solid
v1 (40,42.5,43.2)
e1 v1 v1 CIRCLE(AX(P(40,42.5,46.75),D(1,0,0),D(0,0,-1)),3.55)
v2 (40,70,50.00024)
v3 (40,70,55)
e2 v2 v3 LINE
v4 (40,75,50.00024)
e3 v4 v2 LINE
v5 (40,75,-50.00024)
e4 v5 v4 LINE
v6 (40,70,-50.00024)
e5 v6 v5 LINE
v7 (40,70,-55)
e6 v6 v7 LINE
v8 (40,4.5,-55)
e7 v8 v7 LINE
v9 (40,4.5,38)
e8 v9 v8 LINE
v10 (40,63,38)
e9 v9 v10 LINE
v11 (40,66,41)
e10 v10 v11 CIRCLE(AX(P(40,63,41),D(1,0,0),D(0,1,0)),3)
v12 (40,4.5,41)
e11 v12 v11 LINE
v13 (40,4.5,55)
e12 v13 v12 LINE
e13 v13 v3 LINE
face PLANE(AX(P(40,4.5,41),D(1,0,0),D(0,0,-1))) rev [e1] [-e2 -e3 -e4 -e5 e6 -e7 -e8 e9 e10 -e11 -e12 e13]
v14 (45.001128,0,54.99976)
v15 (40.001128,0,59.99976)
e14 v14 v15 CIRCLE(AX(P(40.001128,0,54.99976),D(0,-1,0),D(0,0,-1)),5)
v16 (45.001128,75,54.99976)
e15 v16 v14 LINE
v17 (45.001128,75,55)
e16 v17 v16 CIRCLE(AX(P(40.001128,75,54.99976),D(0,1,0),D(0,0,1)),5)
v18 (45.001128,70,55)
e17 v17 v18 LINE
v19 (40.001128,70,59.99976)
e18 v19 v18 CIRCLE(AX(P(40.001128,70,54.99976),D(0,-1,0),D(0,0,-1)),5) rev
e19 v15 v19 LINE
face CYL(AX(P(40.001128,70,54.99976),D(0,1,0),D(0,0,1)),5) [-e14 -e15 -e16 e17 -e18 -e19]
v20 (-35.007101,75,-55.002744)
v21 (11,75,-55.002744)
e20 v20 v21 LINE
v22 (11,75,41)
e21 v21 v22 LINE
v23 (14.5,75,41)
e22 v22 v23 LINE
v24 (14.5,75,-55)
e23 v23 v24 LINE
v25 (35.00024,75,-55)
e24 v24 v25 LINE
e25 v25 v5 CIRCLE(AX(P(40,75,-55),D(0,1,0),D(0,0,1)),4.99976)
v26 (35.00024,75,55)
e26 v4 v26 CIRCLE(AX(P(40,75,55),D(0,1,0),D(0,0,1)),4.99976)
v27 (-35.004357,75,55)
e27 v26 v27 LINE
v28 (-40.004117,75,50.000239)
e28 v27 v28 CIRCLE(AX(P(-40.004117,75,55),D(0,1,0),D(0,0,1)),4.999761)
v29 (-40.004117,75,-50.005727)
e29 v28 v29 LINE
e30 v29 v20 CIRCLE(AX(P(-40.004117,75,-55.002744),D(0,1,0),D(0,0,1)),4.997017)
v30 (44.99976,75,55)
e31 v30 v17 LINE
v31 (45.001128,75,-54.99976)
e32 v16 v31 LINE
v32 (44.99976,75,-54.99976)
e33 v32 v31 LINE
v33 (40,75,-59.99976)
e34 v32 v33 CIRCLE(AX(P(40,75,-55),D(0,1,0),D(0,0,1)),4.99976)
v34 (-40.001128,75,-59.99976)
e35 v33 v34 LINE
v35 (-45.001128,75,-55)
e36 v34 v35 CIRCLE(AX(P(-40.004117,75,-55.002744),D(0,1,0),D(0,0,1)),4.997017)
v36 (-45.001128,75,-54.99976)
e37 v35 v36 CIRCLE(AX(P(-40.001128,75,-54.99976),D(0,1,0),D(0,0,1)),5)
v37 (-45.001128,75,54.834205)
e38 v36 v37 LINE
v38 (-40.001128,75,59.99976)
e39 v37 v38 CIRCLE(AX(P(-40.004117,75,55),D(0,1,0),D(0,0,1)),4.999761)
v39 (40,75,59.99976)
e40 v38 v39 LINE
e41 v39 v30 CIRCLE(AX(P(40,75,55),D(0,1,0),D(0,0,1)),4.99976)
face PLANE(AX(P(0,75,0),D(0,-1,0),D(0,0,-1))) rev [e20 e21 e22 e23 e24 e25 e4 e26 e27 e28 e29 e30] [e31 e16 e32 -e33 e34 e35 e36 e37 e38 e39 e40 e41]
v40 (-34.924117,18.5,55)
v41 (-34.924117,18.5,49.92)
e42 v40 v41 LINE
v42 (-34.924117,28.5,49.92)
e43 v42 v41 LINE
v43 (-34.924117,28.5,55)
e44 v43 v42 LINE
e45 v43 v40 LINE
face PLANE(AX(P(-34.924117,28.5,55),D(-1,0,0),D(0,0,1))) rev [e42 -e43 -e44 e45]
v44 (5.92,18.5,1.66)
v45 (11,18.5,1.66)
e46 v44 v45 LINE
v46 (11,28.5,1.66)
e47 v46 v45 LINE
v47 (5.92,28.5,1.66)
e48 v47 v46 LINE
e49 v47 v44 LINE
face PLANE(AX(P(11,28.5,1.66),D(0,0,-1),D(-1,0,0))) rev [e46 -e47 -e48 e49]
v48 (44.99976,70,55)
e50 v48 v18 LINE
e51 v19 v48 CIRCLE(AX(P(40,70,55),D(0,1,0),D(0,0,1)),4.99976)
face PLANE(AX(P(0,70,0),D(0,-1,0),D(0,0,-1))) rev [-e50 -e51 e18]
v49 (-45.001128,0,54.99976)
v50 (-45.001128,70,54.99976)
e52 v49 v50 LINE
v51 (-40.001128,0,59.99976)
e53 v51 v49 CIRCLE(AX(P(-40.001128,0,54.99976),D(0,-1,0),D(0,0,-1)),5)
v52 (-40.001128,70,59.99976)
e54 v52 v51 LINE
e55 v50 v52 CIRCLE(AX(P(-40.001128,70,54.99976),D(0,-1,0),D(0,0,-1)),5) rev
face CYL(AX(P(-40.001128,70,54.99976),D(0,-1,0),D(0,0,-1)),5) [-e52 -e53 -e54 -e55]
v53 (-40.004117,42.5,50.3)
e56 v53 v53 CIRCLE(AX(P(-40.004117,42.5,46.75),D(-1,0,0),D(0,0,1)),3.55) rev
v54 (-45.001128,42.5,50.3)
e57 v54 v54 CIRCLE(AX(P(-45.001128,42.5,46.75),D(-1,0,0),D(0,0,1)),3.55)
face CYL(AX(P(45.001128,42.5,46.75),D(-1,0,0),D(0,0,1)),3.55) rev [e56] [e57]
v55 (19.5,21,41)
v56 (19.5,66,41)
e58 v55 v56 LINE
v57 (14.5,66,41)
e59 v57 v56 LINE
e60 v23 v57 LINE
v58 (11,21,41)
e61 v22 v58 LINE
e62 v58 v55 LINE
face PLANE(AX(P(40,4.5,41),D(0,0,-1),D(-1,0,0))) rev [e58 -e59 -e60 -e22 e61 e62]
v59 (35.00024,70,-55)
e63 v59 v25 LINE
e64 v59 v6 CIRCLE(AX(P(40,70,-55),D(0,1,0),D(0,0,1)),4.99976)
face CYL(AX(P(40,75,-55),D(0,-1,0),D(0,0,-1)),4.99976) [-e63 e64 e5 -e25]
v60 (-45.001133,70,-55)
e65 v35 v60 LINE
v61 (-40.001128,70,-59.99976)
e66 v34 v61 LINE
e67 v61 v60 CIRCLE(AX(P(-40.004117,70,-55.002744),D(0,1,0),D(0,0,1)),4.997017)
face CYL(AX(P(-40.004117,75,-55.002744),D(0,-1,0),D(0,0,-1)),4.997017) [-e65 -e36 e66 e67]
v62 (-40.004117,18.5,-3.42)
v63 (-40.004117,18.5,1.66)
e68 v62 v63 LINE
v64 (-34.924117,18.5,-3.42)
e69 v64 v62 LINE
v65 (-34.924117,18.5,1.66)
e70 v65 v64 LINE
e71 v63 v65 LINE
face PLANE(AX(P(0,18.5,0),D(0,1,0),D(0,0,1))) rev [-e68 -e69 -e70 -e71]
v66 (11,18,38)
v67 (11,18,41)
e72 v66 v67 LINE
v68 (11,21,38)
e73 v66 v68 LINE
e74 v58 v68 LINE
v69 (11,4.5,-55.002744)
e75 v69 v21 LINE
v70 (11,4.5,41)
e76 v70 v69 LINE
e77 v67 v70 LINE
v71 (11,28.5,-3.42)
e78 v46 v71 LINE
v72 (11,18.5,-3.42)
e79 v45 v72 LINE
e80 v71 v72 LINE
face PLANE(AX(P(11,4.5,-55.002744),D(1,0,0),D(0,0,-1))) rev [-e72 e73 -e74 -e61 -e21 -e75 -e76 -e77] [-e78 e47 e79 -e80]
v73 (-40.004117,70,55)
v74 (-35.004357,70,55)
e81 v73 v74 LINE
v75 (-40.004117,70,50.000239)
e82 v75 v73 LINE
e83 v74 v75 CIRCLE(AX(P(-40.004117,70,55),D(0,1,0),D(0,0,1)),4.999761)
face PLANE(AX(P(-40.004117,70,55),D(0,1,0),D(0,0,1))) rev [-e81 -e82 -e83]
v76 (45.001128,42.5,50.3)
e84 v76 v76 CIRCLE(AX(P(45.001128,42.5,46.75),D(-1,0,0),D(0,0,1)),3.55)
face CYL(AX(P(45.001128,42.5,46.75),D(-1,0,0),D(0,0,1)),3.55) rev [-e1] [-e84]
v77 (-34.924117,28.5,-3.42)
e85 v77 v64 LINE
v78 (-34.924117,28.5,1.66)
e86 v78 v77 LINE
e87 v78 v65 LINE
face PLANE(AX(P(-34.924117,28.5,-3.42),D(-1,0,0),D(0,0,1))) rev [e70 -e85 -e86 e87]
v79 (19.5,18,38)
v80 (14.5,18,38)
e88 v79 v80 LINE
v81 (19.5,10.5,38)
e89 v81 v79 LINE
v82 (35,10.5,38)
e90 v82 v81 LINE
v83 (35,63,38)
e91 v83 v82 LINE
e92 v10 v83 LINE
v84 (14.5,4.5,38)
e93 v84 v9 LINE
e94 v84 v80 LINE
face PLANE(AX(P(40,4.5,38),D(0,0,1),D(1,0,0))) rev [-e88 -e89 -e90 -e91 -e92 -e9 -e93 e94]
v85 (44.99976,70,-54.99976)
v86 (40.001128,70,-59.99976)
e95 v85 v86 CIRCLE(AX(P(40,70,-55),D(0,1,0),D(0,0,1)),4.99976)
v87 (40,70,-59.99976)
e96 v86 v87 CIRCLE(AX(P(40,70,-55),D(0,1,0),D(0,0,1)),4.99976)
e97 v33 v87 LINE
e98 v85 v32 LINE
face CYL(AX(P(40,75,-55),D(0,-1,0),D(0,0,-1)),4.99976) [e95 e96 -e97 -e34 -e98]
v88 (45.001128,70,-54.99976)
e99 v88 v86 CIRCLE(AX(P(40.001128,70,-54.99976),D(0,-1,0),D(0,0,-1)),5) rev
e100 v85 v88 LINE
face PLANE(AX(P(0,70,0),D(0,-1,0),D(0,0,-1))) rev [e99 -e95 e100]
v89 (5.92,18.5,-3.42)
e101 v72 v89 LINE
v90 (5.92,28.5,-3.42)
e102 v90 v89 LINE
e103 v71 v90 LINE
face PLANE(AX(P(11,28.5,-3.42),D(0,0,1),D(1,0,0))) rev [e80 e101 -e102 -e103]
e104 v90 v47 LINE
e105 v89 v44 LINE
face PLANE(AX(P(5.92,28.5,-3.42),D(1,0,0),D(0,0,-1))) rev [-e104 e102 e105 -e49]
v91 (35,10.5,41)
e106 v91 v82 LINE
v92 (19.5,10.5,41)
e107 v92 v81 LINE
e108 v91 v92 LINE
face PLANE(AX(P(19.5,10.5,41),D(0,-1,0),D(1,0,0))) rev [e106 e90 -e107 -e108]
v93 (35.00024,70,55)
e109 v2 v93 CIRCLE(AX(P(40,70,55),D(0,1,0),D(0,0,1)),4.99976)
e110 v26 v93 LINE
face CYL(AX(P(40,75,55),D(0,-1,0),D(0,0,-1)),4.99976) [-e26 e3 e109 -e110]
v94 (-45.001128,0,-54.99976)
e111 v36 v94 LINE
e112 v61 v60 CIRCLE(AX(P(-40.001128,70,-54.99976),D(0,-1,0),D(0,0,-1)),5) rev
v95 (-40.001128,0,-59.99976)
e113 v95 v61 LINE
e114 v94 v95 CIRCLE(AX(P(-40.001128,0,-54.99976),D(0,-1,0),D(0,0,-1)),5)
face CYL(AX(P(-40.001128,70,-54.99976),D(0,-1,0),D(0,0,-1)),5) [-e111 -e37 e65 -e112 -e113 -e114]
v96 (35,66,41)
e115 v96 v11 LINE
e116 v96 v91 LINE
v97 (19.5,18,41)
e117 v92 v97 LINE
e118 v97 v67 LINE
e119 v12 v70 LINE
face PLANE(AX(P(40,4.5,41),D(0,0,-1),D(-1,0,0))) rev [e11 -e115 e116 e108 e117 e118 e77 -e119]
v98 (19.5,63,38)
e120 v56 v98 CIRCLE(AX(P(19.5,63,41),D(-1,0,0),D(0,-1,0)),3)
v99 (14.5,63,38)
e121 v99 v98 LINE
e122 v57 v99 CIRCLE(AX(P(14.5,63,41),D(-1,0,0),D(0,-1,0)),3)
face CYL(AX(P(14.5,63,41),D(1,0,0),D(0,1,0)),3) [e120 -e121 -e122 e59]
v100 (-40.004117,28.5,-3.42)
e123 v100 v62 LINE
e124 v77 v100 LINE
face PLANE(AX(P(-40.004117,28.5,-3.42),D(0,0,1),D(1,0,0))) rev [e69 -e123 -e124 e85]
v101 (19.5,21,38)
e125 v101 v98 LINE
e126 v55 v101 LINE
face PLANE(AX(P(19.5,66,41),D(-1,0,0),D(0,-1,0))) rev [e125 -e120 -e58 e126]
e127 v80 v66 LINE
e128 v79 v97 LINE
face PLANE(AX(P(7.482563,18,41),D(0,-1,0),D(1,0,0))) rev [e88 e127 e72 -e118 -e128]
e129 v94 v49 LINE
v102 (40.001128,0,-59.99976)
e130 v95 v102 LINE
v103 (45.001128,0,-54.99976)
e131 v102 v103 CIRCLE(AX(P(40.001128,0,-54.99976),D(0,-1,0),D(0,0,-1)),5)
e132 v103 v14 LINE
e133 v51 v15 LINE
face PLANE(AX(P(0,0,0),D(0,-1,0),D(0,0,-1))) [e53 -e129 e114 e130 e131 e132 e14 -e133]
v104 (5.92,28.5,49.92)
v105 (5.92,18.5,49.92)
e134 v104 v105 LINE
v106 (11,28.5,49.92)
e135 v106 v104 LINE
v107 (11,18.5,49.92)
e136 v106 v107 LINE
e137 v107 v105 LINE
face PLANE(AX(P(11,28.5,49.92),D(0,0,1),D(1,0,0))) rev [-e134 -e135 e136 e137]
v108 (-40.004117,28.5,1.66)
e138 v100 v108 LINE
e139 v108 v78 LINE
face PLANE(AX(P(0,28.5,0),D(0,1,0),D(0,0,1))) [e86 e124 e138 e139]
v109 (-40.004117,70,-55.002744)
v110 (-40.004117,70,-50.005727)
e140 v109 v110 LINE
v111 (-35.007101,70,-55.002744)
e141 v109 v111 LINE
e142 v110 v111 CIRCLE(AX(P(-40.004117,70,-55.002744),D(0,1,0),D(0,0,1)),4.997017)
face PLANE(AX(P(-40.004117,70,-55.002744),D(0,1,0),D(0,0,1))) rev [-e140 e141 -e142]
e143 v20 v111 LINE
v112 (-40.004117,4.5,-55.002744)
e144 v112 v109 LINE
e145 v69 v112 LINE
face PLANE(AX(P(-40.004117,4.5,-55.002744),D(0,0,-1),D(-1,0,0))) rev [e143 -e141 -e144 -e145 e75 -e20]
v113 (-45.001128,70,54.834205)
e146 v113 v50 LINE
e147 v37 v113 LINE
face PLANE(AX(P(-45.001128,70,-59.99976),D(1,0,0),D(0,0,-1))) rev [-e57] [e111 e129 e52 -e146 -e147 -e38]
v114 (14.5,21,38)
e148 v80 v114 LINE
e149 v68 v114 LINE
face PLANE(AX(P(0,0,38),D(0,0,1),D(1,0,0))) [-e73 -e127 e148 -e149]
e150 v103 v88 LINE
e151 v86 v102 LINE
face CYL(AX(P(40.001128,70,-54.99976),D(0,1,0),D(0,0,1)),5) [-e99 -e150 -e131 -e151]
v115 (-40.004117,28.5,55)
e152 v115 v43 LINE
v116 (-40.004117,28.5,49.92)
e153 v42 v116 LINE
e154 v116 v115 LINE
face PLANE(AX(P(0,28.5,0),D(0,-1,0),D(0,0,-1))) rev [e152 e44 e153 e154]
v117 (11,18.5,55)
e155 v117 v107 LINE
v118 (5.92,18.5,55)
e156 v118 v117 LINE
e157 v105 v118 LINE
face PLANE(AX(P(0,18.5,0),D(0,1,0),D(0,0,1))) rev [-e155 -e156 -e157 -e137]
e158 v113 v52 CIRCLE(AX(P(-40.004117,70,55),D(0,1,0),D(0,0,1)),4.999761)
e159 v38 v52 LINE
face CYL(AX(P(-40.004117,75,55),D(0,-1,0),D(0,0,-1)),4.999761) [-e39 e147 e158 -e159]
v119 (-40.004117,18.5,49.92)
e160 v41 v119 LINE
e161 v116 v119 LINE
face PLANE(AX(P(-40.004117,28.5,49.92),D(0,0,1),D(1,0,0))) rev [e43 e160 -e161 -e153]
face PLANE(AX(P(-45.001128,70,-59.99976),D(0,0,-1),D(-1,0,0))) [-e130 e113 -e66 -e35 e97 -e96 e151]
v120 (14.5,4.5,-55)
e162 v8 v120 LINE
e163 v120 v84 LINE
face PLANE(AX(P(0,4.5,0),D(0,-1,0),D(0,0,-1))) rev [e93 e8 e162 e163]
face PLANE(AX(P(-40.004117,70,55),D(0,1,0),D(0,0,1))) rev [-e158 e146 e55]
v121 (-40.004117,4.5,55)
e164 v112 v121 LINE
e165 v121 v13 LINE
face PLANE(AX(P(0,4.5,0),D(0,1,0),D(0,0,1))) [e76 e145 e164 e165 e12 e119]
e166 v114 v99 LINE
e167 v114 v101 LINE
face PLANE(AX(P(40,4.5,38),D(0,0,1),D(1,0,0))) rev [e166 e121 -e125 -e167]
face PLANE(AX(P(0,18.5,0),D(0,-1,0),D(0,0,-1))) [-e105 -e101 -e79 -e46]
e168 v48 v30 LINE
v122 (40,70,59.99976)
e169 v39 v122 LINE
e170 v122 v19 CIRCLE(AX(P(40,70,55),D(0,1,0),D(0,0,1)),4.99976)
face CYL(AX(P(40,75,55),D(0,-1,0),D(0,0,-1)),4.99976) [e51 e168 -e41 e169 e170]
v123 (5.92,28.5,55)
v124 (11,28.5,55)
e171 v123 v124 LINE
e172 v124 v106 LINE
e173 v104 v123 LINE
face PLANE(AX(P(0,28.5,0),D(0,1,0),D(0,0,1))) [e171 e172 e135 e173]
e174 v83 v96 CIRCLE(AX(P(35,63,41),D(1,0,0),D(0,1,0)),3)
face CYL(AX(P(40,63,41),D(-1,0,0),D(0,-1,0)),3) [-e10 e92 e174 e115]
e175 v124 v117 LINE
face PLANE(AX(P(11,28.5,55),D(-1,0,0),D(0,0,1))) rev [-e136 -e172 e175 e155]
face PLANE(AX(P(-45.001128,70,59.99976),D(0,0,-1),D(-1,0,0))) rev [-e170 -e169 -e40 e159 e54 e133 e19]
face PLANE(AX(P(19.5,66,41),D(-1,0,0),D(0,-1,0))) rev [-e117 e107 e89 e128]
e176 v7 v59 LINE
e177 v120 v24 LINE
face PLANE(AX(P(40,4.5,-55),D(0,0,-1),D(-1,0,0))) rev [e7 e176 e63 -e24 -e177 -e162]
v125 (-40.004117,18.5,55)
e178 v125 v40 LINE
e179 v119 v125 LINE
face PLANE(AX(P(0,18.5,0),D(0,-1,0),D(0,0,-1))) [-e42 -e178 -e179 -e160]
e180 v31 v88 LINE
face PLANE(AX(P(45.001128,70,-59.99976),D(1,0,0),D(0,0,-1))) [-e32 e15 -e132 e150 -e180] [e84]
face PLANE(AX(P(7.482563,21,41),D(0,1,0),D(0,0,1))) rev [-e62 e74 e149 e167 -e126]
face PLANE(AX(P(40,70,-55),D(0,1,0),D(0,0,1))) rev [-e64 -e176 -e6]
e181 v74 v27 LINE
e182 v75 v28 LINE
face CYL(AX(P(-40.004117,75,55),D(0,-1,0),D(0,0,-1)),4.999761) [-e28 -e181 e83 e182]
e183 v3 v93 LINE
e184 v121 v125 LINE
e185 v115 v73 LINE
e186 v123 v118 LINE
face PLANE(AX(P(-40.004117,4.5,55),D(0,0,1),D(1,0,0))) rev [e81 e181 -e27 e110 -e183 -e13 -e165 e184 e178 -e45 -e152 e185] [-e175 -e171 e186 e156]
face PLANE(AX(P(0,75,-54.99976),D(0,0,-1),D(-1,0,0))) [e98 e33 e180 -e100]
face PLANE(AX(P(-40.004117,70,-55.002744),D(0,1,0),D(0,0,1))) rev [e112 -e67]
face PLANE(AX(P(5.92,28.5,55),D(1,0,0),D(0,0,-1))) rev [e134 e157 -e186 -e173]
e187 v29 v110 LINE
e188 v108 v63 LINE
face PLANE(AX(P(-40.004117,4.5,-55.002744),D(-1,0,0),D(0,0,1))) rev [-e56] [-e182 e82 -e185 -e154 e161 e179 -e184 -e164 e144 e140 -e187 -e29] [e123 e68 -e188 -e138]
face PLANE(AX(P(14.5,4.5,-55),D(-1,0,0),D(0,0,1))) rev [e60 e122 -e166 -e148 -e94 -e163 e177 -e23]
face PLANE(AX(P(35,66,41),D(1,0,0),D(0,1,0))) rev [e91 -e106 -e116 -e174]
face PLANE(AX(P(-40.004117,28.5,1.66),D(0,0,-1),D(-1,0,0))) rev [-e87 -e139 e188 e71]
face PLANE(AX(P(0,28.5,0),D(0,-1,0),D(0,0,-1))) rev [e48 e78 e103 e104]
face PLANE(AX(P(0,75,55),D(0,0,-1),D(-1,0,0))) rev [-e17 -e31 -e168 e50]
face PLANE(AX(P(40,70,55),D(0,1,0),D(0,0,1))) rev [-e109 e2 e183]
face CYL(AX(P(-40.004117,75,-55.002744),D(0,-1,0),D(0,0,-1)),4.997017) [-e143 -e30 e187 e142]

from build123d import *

# Parameters (mm, degrees)
SKETCH1_W                = 90.002256596
SKETCH1_H                = 119.999519638
BOSS_EXTRUDE1_DEPTH      = 70
SKETCH6_W                = 32
SKETCH6_H                = 11.5
CUT_EXTRUDE2_DEPTH       = 65.5
CUT_EXTRUDE11_DEPTH      = 126.400011923
CUT_EXTRUDE11_DEPTH_BACK = 126.400011923
SKETCH22_R               = 3.55
SKETCH2_W                = 25.5
SKETCH2_H                = 93
CUT_EXTRUDE12_DEPTH      = 65.5
SKETCH23_W               = 15.5
SKETCH23_H               = 55.5
CUT_EXTRUDE13_DEPTH      = 3
SKETCH24_W               = 14.034874412
SKETCH24_H               = 3
CUT_EXTRUDE14_DEPTH      = 3
FILLET2_R                = 5
FILLET3_R                = 5
FILLET4_R                = 5
FILLET5_R                = 5
SKETCH37_W               = 51.004117284
SKETCH37_H               = 107.502744057
CUT_EXTRUDE15_DEPTH      = 65.5
SKETCH53_W               = 3.5
SKETCH53_H               = 96
BOSS_EXTRUDE7_DEPTH      = 5
SKETCH54_W               = 25.5
SKETCH54_H               = 3
CUT_EXTRUDE16_DEPTH      = 4
CUT_EXTRUDE17_DEPTH      = 5
CUT_EXTRUDE18_START      = -5
CUT_EXTRUDE18_DEPTH      = 5
SKETCH58_W               = 80.004117284
SKETCH58_H               = 2.5
CUT_EXTRUDE19_DEPTH      = 65.5
BOSS_EXTRUDE8_START      = 14
SKETCH60_W               = 5.08
SKETCH60_H               = 5.08
BOSS_EXTRUDE8_DEPTH      = 10
BOSS_EXTRUDE9_DEPTH      = 5
SKETCH63_R               = 4.997016655
SKETCH63_R_2             = 4.999759946
SKETCH63_R_3             = 4.999760712
BOSS_EXTRUDE11_DEPTH     = 5
BOSS_EXTRUDE12_DEPTH     = 5


# Read off the part's stored shape, not the designer's step: Boss-Extrude12
with BuildPart() as part:
    # Sketch1 → Boss-Extrude1 (new body)
    with BuildSketch(Plane(origin=(0, 0, 0), x_dir=(1, 0, 0), z_dir=(0, 1, 0))):
        Rectangle(SKETCH1_W, SKETCH1_H)
    extrude(amount=BOSS_EXTRUDE1_DEPTH)

    # Sketch6 → Cut-Extrude2 (cut)
    with BuildSketch(Plane(origin=(0, 70, 0), x_dir=(1, 0, 0), z_dir=(0, 1, 0))):
        with Locations((24, -46.75)):
            Rectangle(SKETCH6_W, SKETCH6_H)
    extrude(amount=-CUT_EXTRUDE2_DEPTH, mode=Mode.SUBTRACT)

    # Sketch22 → Cut-Extrude11 (cut, two sides: drawn at the far end of the back side and taken through both)
    with BuildSketch(Plane.ZY.offset(-40).offset(-CUT_EXTRUDE11_DEPTH_BACK)):
        with Locations((46.75, 42.5)):
            Circle(SKETCH22_R)
    extrude(amount=CUT_EXTRUDE11_DEPTH + CUT_EXTRUDE11_DEPTH_BACK, mode=Mode.SUBTRACT)

    # Sketch2 → Cut-Extrude12 (cut)
    with BuildSketch(Plane(origin=(0, 70, 0), x_dir=(1, 0, 0), z_dir=(0, 1, 0))):
        with Locations((27.25, 8.5)):
            Rectangle(SKETCH2_W, SKETCH2_H)
    extrude(amount=-CUT_EXTRUDE12_DEPTH, mode=Mode.SUBTRACT)

    # Sketch23 → Cut-Extrude13 (cut)
    with BuildSketch(Plane(origin=(0, 0, 38), x_dir=(-1, 0, 0), z_dir=(0, 0, -1))):
        with Locations((-27.25, 38.25)):
            Rectangle(SKETCH23_W, SKETCH23_H)
    extrude(amount=-CUT_EXTRUDE13_DEPTH, mode=Mode.SUBTRACT)

    # Sketch24 → Cut-Extrude14 (cut)
    with BuildSketch(Plane(origin=(0, 0, 38), x_dir=(-1, 0, 0), z_dir=(0, 0, -1))):
        with Locations((-14.5, 19.5)):
            Rectangle(SKETCH24_W, SKETCH24_H)
    extrude(amount=-CUT_EXTRUDE14_DEPTH, mode=Mode.SUBTRACT)

    # Fillet2
    fillet2_edges = [part.edges().sort_by_distance(p)[0] for p in [
        (-45.001128298, 35, 59.999759819),
    ]]
    fillet(fillet2_edges, radius=FILLET2_R)

    # Fillet3
    fillet3_edges = [part.edges().sort_by_distance(p)[0] for p in [
        (45.001128298, 35, 59.999759819),
    ]]
    fillet(fillet3_edges, radius=FILLET3_R)

    # Fillet4
    fillet4_edges = [part.edges().sort_by_distance(p)[0] for p in [
        (45.001128298, 35, -59.999759819),
    ]]
    fillet(fillet4_edges, radius=FILLET4_R)

    # Fillet5
    fillet5_edges = [part.edges().sort_by_distance(p)[0] for p in [
        (-45.001128298, 35, -59.999759819),
    ]]
    fillet(fillet5_edges, radius=FILLET5_R)

    # Sketch37 → Cut-Extrude15 (cut)
    with BuildSketch(Plane(origin=(0, 70, 0), x_dir=(1, 0, 0), z_dir=(0, 1, 0))):
        with Locations((-14.502058642, 1.251372029)):
            Rectangle(SKETCH37_W, SKETCH37_H)
    extrude(amount=-CUT_EXTRUDE15_DEPTH, mode=Mode.SUBTRACT)

    # Sketch53 → Boss-Extrude7 (add)
    with BuildSketch(Plane(origin=(0, 70, 0), x_dir=(1, 0, 0), z_dir=(0, 1, 0))):
        with Locations((12.75, 7)):
            Rectangle(SKETCH53_W, SKETCH53_H)
    extrude(amount=BOSS_EXTRUDE7_DEPTH)

    # Sketch54 → Cut-Extrude16 (cut)
    with BuildSketch(Plane(origin=(0, 70, 0), x_dir=(1, 0, 0), z_dir=(0, 1, 0))):
        with Locations((27.25, -39.5)):
            Rectangle(SKETCH54_W, SKETCH54_H)
    extrude(amount=-CUT_EXTRUDE16_DEPTH, mode=Mode.SUBTRACT)

    # Sketch55 → Cut-Extrude17 (cut)
    with BuildSketch(Plane(origin=(19.5, 0, 0), x_dir=(0, 0, -1), z_dir=(1, 0, 0))):
        with BuildLine():
            Line((-38, 66), (-41, 66))
            ThreePointArc((-41, 66), (-38.878679656, 65.121320344), (-38, 63))
            Line((-38, 63), (-38, 66))
        make_face()
    extrude(amount=-CUT_EXTRUDE17_DEPTH, mode=Mode.SUBTRACT)

    # Sketch56 → Cut-Extrude18 (cut)
    with BuildSketch(Plane.ZY.offset(-35).offset(CUT_EXTRUDE18_START)):
        with BuildLine():
            Line((38, 66), (41, 66))
            ThreePointArc((41, 66), (38.878679656, 65.121320344), (38, 63))
            Line((38, 63), (38, 66))
        make_face()
    extrude(amount=CUT_EXTRUDE18_DEPTH, mode=Mode.SUBTRACT)

    # Sketch58 → Cut-Extrude19 (cut)
    with BuildSketch(Plane(origin=(0, 70, 0), x_dir=(1, 0, 0), z_dir=(0, 1, 0))):
        with Locations((-0.002058642, -53.75)):
            Rectangle(SKETCH58_W, SKETCH58_H)
    extrude(amount=-CUT_EXTRUDE19_DEPTH, mode=Mode.SUBTRACT)

    # Sketch60 → Boss-Extrude8 (add)
    with BuildSketch(Plane(origin=(0, 4.5, 0), x_dir=(1, 0, 0), z_dir=(0, 1, 0)).offset(BOSS_EXTRUDE8_START)):
        with Locations((8.46, -52.46)):
            Rectangle(SKETCH60_W, SKETCH60_H)
        with Locations((-37.464117284, -52.46)):
            Rectangle(SKETCH60_W, SKETCH60_H)
        with Locations((-37.464117284, 0.88)):
            Rectangle(SKETCH60_W, SKETCH60_H)
        with Locations((8.46, 0.88)):
            Rectangle(SKETCH60_W, SKETCH60_H)
    extrude(amount=BOSS_EXTRUDE8_DEPTH)

    # Sketch61 → Boss-Extrude9 (add)
    with BuildSketch(Plane(origin=(0, 70, 0), x_dir=(1, 0, 0), z_dir=(0, 1, 0))):
        Polygon((40, 54.999759819), (40, -55), (45.001128298, -55), (45.001128298, -54.999759819), (45.001128298, 54.999759819), align=None)
        Polygon((-40.004117284, -54.999759819), (-40.004117284, 55), (-45.001128298, 55), (-45.001128298, 54.999759819), (-45.001128298, -54.999759819), align=None)
    extrude(amount=BOSS_EXTRUDE9_DEPTH)

    # Sketch63 → Boss-Extrude11 (add)
    with BuildSketch(Plane(origin=(0, 70, 0), x_dir=(1, 0, 0), z_dir=(0, 1, 0))):
        with Locations((-40.004117284, 55.002744057)):
            Circle(SKETCH63_R)
        with Locations((40, 55)):
            Circle(SKETCH63_R_2)
        with Locations((40, -55)):
            Circle(SKETCH63_R_2)
        with Locations((-40.004117284, -55)):
            Circle(SKETCH63_R_3)
    extrude(amount=BOSS_EXTRUDE11_DEPTH)

    # Boss-Extrude12 outline → Boss-Extrude12 (add)
    with BuildSketch(Plane(origin=(0, 70, 0), x_dir=(1, 0, 0), z_dir=(0, 1, 0))):
        with BuildLine():
            Line((11, 55.002744057), (11, 55))
            Line((11, 55), (35.000240054, 55))
            ThreePointArc((35.000240054, 55), (36.464635838, 58.535364162), (40, 59.999759946))
            Line((40, 59.999759946), (-40.001128298, 59.999759819))
            ThreePointArc((-40.001128298, 59.999759819), (-36.469636313, 58.535111496), (-35.007100628, 55.002744057))
            Line((-35.007100628, 55.002744057), (11, 55.002744057))
        make_face()
        with BuildLine():
            Line((-40.001128298, -59.999759819), (40, -59.999759946))
            ThreePointArc((40, -59.999759946), (36.464635838, -58.535364162), (35.000240054, -55))
            Line((35.000240054, -55), (-35.004356572, -55))
            ThreePointArc((-35.004356572, -55), (-36.467695972, -58.53430778), (-40.001128298, -59.999759819))
        make_face()
    extrude(amount=BOSS_EXTRUDE12_DEPTH)


solid = part.part
